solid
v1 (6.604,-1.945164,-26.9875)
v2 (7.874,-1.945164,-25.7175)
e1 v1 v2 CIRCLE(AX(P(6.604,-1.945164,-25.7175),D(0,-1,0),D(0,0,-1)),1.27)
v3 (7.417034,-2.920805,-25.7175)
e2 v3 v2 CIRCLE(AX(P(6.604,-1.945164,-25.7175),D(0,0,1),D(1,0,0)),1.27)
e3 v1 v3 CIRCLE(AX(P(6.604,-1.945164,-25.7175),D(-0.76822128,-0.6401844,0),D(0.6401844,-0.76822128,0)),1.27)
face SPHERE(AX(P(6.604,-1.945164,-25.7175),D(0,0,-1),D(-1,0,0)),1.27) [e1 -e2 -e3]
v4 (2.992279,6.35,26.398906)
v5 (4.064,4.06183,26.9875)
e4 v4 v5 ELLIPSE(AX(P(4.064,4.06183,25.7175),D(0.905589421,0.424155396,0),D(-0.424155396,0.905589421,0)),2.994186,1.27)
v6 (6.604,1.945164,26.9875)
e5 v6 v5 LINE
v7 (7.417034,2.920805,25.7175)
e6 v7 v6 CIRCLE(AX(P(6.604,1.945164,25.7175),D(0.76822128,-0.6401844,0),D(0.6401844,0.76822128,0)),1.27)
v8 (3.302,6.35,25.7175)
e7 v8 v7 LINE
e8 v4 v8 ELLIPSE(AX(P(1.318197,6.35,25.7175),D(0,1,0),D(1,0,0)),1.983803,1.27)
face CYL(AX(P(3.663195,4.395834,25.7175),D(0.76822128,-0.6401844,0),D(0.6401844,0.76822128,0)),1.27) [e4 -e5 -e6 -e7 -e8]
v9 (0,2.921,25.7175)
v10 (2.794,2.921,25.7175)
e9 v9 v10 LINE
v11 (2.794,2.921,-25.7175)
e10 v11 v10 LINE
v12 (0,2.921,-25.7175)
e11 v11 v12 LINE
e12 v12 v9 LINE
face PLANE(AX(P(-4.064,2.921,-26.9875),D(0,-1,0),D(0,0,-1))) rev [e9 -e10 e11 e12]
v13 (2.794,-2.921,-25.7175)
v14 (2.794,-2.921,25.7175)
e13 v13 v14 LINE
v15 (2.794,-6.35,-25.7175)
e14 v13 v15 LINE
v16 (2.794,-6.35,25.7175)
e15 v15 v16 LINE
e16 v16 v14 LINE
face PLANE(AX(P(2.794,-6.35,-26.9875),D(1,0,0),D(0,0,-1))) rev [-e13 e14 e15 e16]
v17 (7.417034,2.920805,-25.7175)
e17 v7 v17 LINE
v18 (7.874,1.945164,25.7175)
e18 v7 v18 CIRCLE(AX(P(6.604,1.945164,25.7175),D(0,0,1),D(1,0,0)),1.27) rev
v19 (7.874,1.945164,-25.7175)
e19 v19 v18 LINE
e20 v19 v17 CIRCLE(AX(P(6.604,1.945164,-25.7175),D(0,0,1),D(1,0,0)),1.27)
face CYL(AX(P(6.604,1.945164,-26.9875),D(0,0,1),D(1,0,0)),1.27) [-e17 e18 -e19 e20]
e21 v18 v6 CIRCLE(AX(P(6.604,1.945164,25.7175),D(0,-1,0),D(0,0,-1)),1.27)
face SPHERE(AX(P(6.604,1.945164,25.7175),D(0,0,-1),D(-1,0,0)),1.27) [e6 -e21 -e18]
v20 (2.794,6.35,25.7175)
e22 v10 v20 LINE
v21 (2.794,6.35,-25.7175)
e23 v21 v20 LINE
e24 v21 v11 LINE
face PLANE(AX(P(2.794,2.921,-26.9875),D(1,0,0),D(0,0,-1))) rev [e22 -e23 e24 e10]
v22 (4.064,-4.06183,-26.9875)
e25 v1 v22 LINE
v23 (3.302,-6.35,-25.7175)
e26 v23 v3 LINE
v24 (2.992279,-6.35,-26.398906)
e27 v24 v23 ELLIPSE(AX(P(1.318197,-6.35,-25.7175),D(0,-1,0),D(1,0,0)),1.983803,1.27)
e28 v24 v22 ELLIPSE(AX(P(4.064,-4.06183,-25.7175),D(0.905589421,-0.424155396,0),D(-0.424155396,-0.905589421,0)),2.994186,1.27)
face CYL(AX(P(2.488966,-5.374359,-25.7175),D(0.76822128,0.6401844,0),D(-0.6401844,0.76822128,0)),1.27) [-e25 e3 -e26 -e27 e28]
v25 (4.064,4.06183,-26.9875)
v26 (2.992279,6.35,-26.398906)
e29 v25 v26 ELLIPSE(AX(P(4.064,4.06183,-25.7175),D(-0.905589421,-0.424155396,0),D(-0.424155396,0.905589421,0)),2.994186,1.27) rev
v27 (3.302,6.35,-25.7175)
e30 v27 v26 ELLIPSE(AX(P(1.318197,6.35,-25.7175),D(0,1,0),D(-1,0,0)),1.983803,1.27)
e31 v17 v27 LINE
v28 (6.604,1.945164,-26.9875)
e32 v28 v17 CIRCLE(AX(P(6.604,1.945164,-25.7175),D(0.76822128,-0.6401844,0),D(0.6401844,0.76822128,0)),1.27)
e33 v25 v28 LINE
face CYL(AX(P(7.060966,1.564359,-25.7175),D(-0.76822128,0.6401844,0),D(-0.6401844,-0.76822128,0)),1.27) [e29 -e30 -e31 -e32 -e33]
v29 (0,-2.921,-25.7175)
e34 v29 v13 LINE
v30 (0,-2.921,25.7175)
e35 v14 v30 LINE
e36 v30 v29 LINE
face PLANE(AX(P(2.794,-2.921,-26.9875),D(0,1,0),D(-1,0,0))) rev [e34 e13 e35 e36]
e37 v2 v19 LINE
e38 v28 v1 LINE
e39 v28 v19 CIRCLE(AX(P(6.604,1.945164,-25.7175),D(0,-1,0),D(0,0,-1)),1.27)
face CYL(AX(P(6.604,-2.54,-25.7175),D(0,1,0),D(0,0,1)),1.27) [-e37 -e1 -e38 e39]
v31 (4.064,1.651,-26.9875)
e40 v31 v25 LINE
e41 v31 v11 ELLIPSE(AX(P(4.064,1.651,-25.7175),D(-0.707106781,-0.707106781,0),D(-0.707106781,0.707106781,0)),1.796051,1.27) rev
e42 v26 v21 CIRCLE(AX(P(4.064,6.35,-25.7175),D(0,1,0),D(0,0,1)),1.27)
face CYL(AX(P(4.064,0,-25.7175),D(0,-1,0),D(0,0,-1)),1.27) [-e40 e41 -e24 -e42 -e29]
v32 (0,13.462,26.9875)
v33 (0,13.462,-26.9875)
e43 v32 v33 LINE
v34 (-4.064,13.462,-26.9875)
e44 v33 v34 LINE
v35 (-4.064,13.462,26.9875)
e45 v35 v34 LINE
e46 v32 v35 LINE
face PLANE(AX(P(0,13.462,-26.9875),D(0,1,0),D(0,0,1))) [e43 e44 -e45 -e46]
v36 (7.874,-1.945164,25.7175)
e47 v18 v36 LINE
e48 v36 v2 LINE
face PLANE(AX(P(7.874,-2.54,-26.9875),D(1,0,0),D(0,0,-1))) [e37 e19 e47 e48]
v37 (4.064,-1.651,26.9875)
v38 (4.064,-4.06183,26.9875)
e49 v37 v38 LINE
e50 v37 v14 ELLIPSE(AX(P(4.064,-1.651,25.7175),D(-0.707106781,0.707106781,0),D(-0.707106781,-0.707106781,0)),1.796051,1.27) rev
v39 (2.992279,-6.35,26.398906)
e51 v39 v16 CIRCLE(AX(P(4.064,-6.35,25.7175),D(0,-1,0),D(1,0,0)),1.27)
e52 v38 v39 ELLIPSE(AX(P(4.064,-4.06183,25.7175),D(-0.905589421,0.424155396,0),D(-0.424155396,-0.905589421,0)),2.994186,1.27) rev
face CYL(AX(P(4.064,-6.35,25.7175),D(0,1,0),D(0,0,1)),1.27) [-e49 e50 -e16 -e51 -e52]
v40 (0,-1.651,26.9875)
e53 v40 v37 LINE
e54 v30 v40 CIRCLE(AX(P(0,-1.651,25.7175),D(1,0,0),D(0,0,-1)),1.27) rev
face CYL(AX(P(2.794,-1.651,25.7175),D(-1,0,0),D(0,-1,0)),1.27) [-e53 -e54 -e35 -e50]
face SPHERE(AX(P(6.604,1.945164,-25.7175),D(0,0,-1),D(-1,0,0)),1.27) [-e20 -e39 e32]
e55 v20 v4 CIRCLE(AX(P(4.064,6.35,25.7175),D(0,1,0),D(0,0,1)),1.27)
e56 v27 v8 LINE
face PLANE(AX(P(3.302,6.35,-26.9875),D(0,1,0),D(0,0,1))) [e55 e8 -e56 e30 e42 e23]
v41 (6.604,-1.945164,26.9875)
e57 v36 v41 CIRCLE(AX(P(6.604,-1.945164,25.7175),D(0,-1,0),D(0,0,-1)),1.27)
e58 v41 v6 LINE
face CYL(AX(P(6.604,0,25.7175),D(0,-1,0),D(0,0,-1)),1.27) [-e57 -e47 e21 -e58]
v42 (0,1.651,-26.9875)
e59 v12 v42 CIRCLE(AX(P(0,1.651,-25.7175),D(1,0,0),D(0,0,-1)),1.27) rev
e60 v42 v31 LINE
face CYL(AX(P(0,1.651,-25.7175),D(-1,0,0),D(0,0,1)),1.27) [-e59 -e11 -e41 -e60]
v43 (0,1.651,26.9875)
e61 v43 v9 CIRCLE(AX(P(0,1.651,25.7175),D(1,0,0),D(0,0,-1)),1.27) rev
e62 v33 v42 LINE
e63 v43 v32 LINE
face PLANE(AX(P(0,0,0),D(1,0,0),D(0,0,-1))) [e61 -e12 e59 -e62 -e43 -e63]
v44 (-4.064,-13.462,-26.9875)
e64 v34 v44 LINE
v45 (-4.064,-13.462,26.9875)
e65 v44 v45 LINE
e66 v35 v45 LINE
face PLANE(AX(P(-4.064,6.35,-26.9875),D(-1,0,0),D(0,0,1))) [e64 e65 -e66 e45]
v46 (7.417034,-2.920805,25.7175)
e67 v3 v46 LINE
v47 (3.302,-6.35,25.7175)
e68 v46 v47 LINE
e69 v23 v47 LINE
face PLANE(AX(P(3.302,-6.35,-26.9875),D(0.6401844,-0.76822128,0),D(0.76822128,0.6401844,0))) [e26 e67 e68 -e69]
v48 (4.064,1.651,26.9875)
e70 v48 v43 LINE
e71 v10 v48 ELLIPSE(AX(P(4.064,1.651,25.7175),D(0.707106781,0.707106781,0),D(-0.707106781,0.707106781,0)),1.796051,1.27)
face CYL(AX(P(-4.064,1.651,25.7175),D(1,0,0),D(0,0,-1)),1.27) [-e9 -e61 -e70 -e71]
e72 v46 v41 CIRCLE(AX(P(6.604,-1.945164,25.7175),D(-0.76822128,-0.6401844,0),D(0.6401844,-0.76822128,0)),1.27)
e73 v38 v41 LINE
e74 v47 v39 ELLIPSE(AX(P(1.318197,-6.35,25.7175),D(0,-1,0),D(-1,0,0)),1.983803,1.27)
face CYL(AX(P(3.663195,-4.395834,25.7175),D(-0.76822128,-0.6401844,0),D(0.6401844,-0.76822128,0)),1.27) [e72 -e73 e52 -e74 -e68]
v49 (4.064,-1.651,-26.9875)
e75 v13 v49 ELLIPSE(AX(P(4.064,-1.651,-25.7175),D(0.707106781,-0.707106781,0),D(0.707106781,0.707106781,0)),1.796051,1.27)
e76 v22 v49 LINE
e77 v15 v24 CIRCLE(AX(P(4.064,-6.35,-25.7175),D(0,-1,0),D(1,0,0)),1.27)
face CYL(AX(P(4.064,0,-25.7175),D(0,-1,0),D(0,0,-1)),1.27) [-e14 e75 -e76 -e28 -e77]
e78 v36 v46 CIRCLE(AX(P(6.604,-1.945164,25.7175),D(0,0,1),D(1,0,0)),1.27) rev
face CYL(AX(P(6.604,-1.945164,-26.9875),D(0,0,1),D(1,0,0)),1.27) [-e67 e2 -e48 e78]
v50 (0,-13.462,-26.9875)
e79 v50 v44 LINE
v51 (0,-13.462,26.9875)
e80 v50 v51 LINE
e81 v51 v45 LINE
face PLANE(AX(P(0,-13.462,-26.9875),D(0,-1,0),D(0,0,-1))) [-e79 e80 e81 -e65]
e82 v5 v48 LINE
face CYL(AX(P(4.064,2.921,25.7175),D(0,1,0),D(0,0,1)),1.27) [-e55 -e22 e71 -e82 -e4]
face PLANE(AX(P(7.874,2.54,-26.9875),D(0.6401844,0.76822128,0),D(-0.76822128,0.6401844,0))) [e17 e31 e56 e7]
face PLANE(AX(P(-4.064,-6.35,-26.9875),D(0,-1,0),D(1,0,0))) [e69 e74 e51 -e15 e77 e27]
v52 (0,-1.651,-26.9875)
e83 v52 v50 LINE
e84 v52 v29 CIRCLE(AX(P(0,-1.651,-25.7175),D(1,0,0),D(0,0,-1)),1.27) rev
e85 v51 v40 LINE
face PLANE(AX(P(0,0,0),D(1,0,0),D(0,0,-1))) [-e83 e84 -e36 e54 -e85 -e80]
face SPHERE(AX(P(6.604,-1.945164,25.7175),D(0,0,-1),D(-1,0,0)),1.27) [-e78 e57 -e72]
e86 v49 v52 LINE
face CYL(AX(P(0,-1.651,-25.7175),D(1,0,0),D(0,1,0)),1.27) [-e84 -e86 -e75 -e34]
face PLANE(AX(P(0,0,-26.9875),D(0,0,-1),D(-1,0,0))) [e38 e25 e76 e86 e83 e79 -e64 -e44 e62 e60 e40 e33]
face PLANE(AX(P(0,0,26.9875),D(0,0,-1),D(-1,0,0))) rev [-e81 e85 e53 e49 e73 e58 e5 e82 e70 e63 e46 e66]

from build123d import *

# Parameters (mm, degrees)
BOSS_EXTRUDE1_DEPTH = 53.975
SKETCH2_W           = 6.858
SKETCH2_H           = 3.429
CUT_EXTRUDE1_DEPTH  = 55.91468839
SKETCH4_W           = 6.858
SKETCH4_H           = 3.429
CUT_EXTRUDE2_DEPTH  = 55.91468839
SKETCH18_W          = 53.975
SKETCH18_H          = 26.924
BOSS_EXTRUDE5_DEPTH = 4.064
FILLET1_R           = 1.27
FILLET3_R           = 1.27
FILLET5_R           = 1.27


with BuildPart() as part:
    # Sketch1 → Boss-Extrude1 (new body)
    with BuildSketch(Plane.XY.offset(26.9875)):
        Polygon((3.302, 6.35), (-4.064, 6.35), (-4.064, -6.35), (3.302, -6.35), (7.874, -2.54), (7.874, 2.54), align=None)
    extrude(amount=-BOSS_EXTRUDE1_DEPTH)

    # Sketch2 → Cut-Extrude1 (cut, through all)
    with BuildSketch(Plane.XY.offset(26.9875)):
        with Locations((-0.635, 4.6355)):
            Rectangle(SKETCH2_W, SKETCH2_H)
    extrude(amount=-CUT_EXTRUDE1_DEPTH, mode=Mode.SUBTRACT)

    # Sketch4 → Cut-Extrude2 (cut, through all)
    with BuildSketch(Plane.XY.offset(26.9875)):
        with Locations((-0.635, -4.6355)):
            Rectangle(SKETCH4_W, SKETCH4_H)
    extrude(amount=-CUT_EXTRUDE2_DEPTH, mode=Mode.SUBTRACT)

    # Sketch18 → Boss-Extrude5 (add)
    with BuildSketch(Plane.ZY.offset(4.064)):
        Rectangle(SKETCH18_W, SKETCH18_H)
    extrude(amount=-BOSS_EXTRUDE5_DEPTH)

    # Fillet1
    fillet1_edges = [part.edges().sort_by_distance(p)[0] for p in [
        (7.874, 2.54, 0),
        (7.874, -2.54, 0),
    ]]
    fillet(fillet1_edges, radius=FILLET1_R)

    # Fillet3
    # the kernel refuses this fillet: 1.27 mm, written as the material it takes off along each edge
    with BuildSketch(Plane(origin=(0.862897437, -8.382585469, -26.9875), x_dir=(-0.6401843996644798, 0.7682212795973759, 0), z_dir=(0.7682212795973759, 0.6401843996644799, 0))) as fillet3_piece_1:
        with BuildLine():
            CenterArc((FILLET3_R, FILLET3_R), FILLET3_R, 180, 90)
            Line((0, FILLET3_R), (0, 0))
            Line((0, 0), (FILLET3_R, 0))
        make_face()
    extrude(amount=8.531574072, mode=Mode.SUBTRACT)
    with BuildSketch(Plane(origin=(6.604, -1.945163819, -26.9875), x_dir=(1, 0, 0), z_dir=(0, 1, 0))) as fillet3_piece_2:
        with BuildLine():
            CenterArc((1.27 - FILLET3_R, -FILLET3_R), FILLET3_R, 0, 90)
            Line((1.27, -FILLET3_R), (1.27, 0))
            Line((1.27, 0), (1.27 - FILLET3_R, 0))
        make_face()
    revolve(axis=Axis((6.604, -1.945163819, -26.9875), (0, 0, -1)), revolution_arc=50.194428908, mode=Mode.SUBTRACT)
    with BuildSketch(Plane(origin=(7.417034188, 2.920804844, -26.9875), x_dir=(0, 0, 1), z_dir=(-0.7682212795973759, 0.6401843996644799, 0))) as fillet3_piece_3:
        with BuildLine():
            CenterArc((FILLET3_R, -FILLET3_R), FILLET3_R, 90, 90)
            Line((0, -FILLET3_R), (0, 0))
            Line((0, 0), (FILLET3_R, 0))
        make_face()
    extrude(amount=8.531574072, mode=Mode.SUBTRACT)
    with BuildSketch(Plane(origin=(6.604, 1.945163819, -26.9875), x_dir=(0.6401843996644799, 0.7682212795973757, 0), z_dir=(-0.7682212795973757, 0.6401843996644799, 0))) as fillet3_piece_4:
        with BuildLine():
            CenterArc((1.27 - FILLET3_R, -FILLET3_R), FILLET3_R, 0, 90)
            Line((1.27 - FILLET3_R, 0), (1.27, 0))
            Line((1.27, 0), (1.27, -FILLET3_R))
        make_face()
    revolve(axis=Axis((6.604, 1.945163819, -26.9875), (0, 0, -1)), revolution_arc=50.194428908, mode=Mode.SUBTRACT)
    with BuildSketch(Plane(origin=(2.794, -2.921, -26.9875), x_dir=(0, 1, 0), z_dir=(-1, 0, 0)), Plane(origin=(0, 2.921, -26.9875), x_dir=(0, -1, 0), z_dir=(1, 0, 0))) as fillet3_piece_5:
        with BuildLine():
            CenterArc((FILLET3_R, -FILLET3_R), FILLET3_R, 90, 90)
            Line((0, -FILLET3_R), (0, 0))
            Line((0, 0), (FILLET3_R, 0))
        make_face()
    extrude(amount=2.794, mode=Mode.SUBTRACT)
    with BuildSketch(Plane(origin=(2.794, 2.921, -26.9875), x_dir=(1, 0, 0), z_dir=(0, 1, 0)), Plane(origin=(2.794, -9.525, -26.9875), x_dir=(1, 0, 0), z_dir=(0, 1, 0))) as fillet3_piece_6:
        with BuildLine():
            CenterArc((FILLET3_R, -FILLET3_R), FILLET3_R, 90, 90)
            Line((0, -FILLET3_R), (0, 0))
            Line((0, 0), (FILLET3_R, 0))
        make_face()
    extrude(amount=6.604, mode=Mode.SUBTRACT)
    with BuildSketch(Plane(origin=(7.874, -1.945163819, -26.9875), x_dir=(-1, 0, 0), z_dir=(0, 1, 0))) as fillet3_piece_7:
        with BuildLine():
            CenterArc((FILLET3_R, FILLET3_R), FILLET3_R, 180, 90)
            Line((0, FILLET3_R), (0, 0))
            Line((0, 0), (FILLET3_R, 0))
        make_face()
    extrude(amount=3.890327637, mode=Mode.SUBTRACT)
    with BuildSketch(Plane(origin=(2.794, -9.525, -26.9875), x_dir=(1, 0, 0), z_dir=(0, 1, 0))) as fillet3_piece_8a_section:
        with BuildLine():
            CenterArc((FILLET3_R, -FILLET3_R), FILLET3_R, 90, 90)
            Line((0, -FILLET3_R), (0, 0))
            Line((0, 0), (FILLET3_R, 0))
        make_face()
    fillet3_piece_8a = extrude(amount=9.779, mode=Mode.PRIVATE)
    fillet3_piece_8a = split(fillet3_piece_8a, bisect_by=Plane(origin=(3.081521795, -2.921, -26.699978205), z_dir=(0, 1, 0)), keep=Keep.TOP, mode=Mode.PRIVATE)
    with BuildSketch(Plane(origin=(5.969, -2.921, -26.9875), x_dir=(0, 1, 0), z_dir=(-1, 0, 0))) as fillet3_piece_8b_section:
        with BuildLine():
            CenterArc((FILLET3_R, -FILLET3_R), FILLET3_R, 90, 90)
            Line((0, -FILLET3_R), (0, 0))
            Line((0, 0), (FILLET3_R, 0))
        make_face()
    fillet3_piece_8b = extrude(amount=5.969, mode=Mode.PRIVATE)
    fillet3_piece_8b = split(fillet3_piece_8b, bisect_by=Plane(origin=(2.794, -2.633478205, -26.699978205), z_dir=(1, 0, 0)), keep=Keep.TOP, mode=Mode.PRIVATE)
    fillet3_piece_8 = fillet3_piece_8a & fillet3_piece_8b
    add(fillet3_piece_8, mode=Mode.SUBTRACT)
    with BuildSketch(Plane(origin=(2.794, -0.254, -26.9875), x_dir=(1, 0, 0), z_dir=(0, 1, 0))) as fillet3_piece_9a_section:
        with BuildLine():
            CenterArc((FILLET3_R, -FILLET3_R), FILLET3_R, 90, 90)
            Line((0, -FILLET3_R), (0, 0))
            Line((0, 0), (FILLET3_R, 0))
        make_face()
    fillet3_piece_9a = extrude(amount=9.779, mode=Mode.PRIVATE)
    fillet3_piece_9a = split(fillet3_piece_9a, bisect_by=Plane(origin=(3.081521795, 2.921, -26.699978205), z_dir=(0, -1, 0)), keep=Keep.TOP, mode=Mode.PRIVATE)
    with BuildSketch(Plane(origin=(0, 2.921, -26.9875), x_dir=(0, -1, 0), z_dir=(1, 0, 0))) as fillet3_piece_9b_section:
        with BuildLine():
            CenterArc((FILLET3_R, -FILLET3_R), FILLET3_R, 90, 90)
            Line((0, -FILLET3_R), (0, 0))
            Line((0, 0), (FILLET3_R, 0))
        make_face()
    fillet3_piece_9b = extrude(amount=5.969, mode=Mode.PRIVATE)
    fillet3_piece_9b = split(fillet3_piece_9b, bisect_by=Plane(origin=(2.794, 2.633478205, -26.699978205), z_dir=(1, 0, 0)), keep=Keep.TOP, mode=Mode.PRIVATE)
    fillet3_piece_9 = fillet3_piece_9a & fillet3_piece_9b
    add(fillet3_piece_9, mode=Mode.SUBTRACT)

    # Fillet5
    # the kernel refuses this fillet: 1.27 mm, written as the material it takes off along each edge
    with BuildSketch(Plane(origin=(0.862897437, -8.382585469, 26.9875), x_dir=(0, 0, -1), z_dir=(0.7682212795973759, 0.6401843996644799, 0)), Plane(origin=(7.417034188, 2.920804844, 26.9875), x_dir=(0, 0, -1), z_dir=(-0.7682212795973759, 0.6401843996644799, 0))) as fillet5_piece_1:
        with BuildLine():
            CenterArc((FILLET5_R, FILLET5_R), FILLET5_R, 180, 90)
            Line((0, FILLET5_R), (0, 0))
            Line((0, 0), (FILLET5_R, 0))
        make_face()
    extrude(amount=8.531574072, mode=Mode.SUBTRACT)
    with BuildSketch(Plane(origin=(6.604, -1.945163819, 26.9875), x_dir=(1, 0, 0), z_dir=(0, 1, 0))) as fillet5_piece_2:
        with BuildLine():
            CenterArc((1.27 - FILLET5_R, FILLET5_R), FILLET5_R, 270, 90)
            Line((1.27 - FILLET5_R, 0), (1.27, 0))
            Line((1.27, 0), (1.27, FILLET5_R))
        make_face()
    revolve(axis=Axis((6.604, -1.945163819, 26.9875), (0, 0, -1)), revolution_arc=50.194428908, mode=Mode.SUBTRACT)
    with BuildSketch(Plane(origin=(6.604, 1.945163819, 26.9875), x_dir=(0.6401843996644799, 0.7682212795973757, 0), z_dir=(-0.7682212795973757, 0.6401843996644799, 0))) as fillet5_piece_3:
        with BuildLine():
            CenterArc((1.27 - FILLET5_R, FILLET5_R), FILLET5_R, 270, 90)
            Line((1.27 - FILLET5_R, 0), (1.27, 0))
            Line((1.27, 0), (1.27, FILLET5_R))
        make_face()
    revolve(axis=Axis((6.604, 1.945163819, 26.9875), (0, 0, -1)), revolution_arc=50.194428908, mode=Mode.SUBTRACT)
    with BuildSketch(Plane(origin=(2.794, 2.921, 26.9875), x_dir=(0, 0, -1), z_dir=(0, 1, 0)), Plane(origin=(2.794, -9.525, 26.9875), x_dir=(0, 0, -1), z_dir=(0, 1, 0))) as fillet5_piece_4:
        with BuildLine():
            CenterArc((FILLET5_R, -FILLET5_R), FILLET5_R, 90, 90)
            Line((0, -FILLET5_R), (0, 0))
            Line((0, 0), (FILLET5_R, 0))
        make_face()
    extrude(amount=6.604, mode=Mode.SUBTRACT)
    with BuildSketch(Plane(origin=(0, 2.921, 26.9875), x_dir=(0, 0, -1), z_dir=(1, 0, 0)), Plane(origin=(2.794, -2.921, 26.9875), x_dir=(0, 0, -1), z_dir=(-1, 0, 0))) as fillet5_piece_5:
        with BuildLine():
            CenterArc((FILLET5_R, -FILLET5_R), FILLET5_R, 90, 90)
            Line((0, -FILLET5_R), (0, 0))
            Line((0, 0), (FILLET5_R, 0))
        make_face()
    extrude(amount=2.794, mode=Mode.SUBTRACT)
    with BuildSketch(Plane(origin=(7.874, -1.945163819, 26.9875), x_dir=(0, 0, -1), z_dir=(0, 1, 0))) as fillet5_piece_6:
        with BuildLine():
            CenterArc((FILLET5_R, FILLET5_R), FILLET5_R, 180, 90)
            Line((0, FILLET5_R), (0, 0))
            Line((0, 0), (FILLET5_R, 0))
        make_face()
    extrude(amount=3.890327637, mode=Mode.SUBTRACT)
    with BuildSketch(Plane(origin=(0, 2.921, 26.9875), x_dir=(0, 0, -1), z_dir=(1, 0, 0))) as fillet5_piece_7a_section:
        with BuildLine():
            CenterArc((FILLET5_R, -FILLET5_R), FILLET5_R, 90, 90)
            Line((0, -FILLET5_R), (0, 0))
            Line((0, 0), (FILLET5_R, 0))
        make_face()
    fillet5_piece_7a = extrude(amount=5.969, mode=Mode.PRIVATE)
    fillet5_piece_7a = split(fillet5_piece_7a, bisect_by=Plane(origin=(2.794, 2.633478205, 26.699978205), z_dir=(1, 0, 0)), keep=Keep.TOP, mode=Mode.PRIVATE)
    with BuildSketch(Plane(origin=(2.794, -0.254, 26.9875), x_dir=(0, 0, -1), z_dir=(0, 1, 0))) as fillet5_piece_7b_section:
        with BuildLine():
            CenterArc((FILLET5_R, -FILLET5_R), FILLET5_R, 90, 90)
            Line((0, -FILLET5_R), (0, 0))
            Line((0, 0), (FILLET5_R, 0))
        make_face()
    fillet5_piece_7b = extrude(amount=9.779, mode=Mode.PRIVATE)
    fillet5_piece_7b = split(fillet5_piece_7b, bisect_by=Plane(origin=(3.081521795, 2.921, 26.699978205), z_dir=(0, -1, 0)), keep=Keep.TOP, mode=Mode.PRIVATE)
    fillet5_piece_7 = fillet5_piece_7a & fillet5_piece_7b
    add(fillet5_piece_7, mode=Mode.SUBTRACT)
    with BuildSketch(Plane(origin=(2.794, -9.525, 26.9875), x_dir=(0, 0, -1), z_dir=(0, 1, 0))) as fillet5_piece_8a_section:
        with BuildLine():
            CenterArc((FILLET5_R, -FILLET5_R), FILLET5_R, 90, 90)
            Line((0, -FILLET5_R), (0, 0))
            Line((0, 0), (FILLET5_R, 0))
        make_face()
    fillet5_piece_8a = extrude(amount=9.779, mode=Mode.PRIVATE)
    fillet5_piece_8a = split(fillet5_piece_8a, bisect_by=Plane(origin=(3.081521795, -2.921, 26.699978205), z_dir=(0, 1, 0)), keep=Keep.TOP, mode=Mode.PRIVATE)
    with BuildSketch(Plane(origin=(5.969, -2.921, 26.9875), x_dir=(0, 0, -1), z_dir=(-1, 0, 0))) as fillet5_piece_8b_section:
        with BuildLine():
            CenterArc((FILLET5_R, -FILLET5_R), FILLET5_R, 90, 90)
            Line((0, -FILLET5_R), (0, 0))
            Line((0, 0), (FILLET5_R, 0))
        make_face()
    fillet5_piece_8b = extrude(amount=5.969, mode=Mode.PRIVATE)
    fillet5_piece_8b = split(fillet5_piece_8b, bisect_by=Plane(origin=(2.794, -2.633478205, 26.699978205), z_dir=(1, 0, 0)), keep=Keep.TOP, mode=Mode.PRIVATE)
    fillet5_piece_8 = fillet5_piece_8a & fillet5_piece_8b
    add(fillet5_piece_8, mode=Mode.SUBTRACT)


solid = part.part
